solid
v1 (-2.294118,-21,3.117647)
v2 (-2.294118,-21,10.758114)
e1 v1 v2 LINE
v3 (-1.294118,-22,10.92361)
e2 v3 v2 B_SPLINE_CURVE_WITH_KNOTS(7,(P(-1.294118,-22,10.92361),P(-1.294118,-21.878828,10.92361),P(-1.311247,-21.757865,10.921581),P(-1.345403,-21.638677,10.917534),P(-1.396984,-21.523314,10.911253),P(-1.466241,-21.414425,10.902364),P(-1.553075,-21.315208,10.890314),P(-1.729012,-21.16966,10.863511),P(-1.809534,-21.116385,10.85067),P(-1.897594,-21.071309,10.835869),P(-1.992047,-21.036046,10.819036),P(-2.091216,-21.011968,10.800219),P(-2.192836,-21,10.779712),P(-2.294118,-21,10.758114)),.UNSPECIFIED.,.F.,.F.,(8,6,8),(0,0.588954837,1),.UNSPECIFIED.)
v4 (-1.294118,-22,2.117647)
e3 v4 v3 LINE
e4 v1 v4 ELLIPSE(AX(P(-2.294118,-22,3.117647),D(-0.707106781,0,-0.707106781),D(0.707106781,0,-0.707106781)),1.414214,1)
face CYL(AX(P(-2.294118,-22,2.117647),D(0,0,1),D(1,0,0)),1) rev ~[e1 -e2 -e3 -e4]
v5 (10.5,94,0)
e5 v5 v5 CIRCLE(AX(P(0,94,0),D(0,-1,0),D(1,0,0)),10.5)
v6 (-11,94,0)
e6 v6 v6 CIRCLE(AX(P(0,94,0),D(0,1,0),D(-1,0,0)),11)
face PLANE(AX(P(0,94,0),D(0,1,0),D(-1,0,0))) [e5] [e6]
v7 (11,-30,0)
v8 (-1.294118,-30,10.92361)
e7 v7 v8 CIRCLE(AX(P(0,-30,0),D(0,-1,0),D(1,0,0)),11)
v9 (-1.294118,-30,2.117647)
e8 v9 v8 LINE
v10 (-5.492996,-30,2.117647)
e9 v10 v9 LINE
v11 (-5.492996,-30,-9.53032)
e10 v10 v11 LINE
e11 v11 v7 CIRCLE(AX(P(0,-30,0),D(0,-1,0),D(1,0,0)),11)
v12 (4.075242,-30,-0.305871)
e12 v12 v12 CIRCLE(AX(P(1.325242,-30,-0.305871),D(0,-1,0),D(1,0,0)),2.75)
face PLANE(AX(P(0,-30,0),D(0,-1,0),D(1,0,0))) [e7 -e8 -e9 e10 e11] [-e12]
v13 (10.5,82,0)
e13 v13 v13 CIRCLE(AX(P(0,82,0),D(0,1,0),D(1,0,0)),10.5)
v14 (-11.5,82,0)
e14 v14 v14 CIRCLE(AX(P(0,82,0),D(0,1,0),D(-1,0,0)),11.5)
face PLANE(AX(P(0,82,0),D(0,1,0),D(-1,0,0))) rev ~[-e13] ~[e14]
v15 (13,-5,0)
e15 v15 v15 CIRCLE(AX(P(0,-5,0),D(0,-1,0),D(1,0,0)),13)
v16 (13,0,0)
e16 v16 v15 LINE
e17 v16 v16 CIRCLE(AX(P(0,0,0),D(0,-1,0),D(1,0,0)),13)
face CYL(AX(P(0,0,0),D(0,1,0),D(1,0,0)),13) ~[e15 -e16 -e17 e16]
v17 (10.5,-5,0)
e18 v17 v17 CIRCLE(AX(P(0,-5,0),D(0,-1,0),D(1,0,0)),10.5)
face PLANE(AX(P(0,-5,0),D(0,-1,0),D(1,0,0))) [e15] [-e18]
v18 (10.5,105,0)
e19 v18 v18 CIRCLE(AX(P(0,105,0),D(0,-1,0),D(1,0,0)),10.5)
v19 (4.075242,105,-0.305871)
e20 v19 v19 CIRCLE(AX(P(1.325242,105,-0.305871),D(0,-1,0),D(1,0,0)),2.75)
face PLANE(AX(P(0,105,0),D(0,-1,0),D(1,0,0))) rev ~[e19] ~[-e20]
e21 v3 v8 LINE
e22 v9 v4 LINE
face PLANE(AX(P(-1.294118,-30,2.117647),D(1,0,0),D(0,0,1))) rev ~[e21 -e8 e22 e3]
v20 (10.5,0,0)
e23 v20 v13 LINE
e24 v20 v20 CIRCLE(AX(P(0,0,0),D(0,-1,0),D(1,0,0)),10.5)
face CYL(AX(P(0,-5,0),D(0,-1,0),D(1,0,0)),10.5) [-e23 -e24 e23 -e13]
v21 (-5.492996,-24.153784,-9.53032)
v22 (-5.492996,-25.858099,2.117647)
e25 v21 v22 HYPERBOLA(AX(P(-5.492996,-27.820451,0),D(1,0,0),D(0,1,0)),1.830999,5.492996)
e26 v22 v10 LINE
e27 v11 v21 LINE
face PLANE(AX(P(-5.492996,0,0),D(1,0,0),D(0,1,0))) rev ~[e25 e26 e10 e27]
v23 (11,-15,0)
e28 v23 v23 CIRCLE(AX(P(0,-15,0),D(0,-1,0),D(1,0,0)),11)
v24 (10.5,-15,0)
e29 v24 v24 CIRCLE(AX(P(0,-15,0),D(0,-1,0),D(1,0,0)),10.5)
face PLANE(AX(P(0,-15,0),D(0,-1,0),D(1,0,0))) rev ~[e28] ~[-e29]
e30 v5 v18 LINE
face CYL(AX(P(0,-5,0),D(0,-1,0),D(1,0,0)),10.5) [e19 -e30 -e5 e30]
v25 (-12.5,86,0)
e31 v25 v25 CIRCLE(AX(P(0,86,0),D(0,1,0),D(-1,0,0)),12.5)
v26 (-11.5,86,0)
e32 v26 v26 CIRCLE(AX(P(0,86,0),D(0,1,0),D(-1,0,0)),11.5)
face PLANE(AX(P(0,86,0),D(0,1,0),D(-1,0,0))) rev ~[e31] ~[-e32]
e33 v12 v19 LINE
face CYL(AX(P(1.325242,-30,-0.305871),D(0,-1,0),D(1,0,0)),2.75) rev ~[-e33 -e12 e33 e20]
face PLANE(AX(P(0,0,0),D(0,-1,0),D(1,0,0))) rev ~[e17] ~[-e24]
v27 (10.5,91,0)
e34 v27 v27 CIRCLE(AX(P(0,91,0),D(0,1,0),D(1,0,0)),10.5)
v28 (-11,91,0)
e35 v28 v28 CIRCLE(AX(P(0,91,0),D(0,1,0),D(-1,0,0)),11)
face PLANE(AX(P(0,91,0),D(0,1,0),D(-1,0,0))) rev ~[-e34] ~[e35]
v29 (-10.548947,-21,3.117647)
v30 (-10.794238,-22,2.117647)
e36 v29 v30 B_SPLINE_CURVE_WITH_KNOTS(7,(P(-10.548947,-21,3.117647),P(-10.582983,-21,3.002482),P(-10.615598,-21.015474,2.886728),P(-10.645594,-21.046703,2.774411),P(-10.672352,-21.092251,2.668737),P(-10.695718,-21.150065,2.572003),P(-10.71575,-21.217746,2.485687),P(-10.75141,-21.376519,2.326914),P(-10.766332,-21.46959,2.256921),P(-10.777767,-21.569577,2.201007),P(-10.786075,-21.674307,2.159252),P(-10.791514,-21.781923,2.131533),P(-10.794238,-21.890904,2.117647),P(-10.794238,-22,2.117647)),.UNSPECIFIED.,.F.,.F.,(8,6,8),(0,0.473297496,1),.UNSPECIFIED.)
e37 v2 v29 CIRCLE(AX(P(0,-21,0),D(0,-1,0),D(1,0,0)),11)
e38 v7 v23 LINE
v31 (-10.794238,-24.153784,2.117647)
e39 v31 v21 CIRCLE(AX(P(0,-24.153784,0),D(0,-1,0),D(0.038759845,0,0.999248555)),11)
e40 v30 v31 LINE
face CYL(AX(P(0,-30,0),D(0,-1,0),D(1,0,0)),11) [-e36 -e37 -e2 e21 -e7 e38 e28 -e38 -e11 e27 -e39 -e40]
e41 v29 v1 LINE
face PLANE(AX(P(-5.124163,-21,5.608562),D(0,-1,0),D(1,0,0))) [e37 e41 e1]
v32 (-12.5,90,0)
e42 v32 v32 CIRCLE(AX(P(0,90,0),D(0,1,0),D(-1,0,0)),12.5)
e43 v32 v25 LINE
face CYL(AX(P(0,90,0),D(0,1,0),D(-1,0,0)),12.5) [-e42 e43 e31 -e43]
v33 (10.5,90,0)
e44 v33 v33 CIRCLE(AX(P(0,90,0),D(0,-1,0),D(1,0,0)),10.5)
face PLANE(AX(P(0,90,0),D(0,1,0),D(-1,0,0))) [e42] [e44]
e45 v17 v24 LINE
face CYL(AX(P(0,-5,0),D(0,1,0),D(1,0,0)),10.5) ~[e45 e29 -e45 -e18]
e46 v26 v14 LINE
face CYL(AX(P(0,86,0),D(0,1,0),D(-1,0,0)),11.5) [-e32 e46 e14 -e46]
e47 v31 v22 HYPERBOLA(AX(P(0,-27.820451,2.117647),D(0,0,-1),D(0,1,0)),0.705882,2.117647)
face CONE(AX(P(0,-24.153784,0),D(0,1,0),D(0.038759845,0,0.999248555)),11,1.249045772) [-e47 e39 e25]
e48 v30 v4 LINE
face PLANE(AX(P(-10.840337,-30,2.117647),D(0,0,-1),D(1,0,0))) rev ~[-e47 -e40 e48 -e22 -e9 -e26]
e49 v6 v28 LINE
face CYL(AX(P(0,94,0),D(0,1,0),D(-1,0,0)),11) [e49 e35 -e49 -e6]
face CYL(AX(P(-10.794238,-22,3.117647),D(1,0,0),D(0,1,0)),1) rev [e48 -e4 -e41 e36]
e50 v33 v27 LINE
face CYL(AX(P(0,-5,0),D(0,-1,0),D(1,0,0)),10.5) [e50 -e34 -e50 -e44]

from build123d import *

# Parameters (mm, degrees)
F0_R          = 13
F1_DEPTH      = 5
F2_R          = 10.5
F3_DEPTH      = 25
F3_DEPTH_BACK = 110
F6_START      = -19
F5_R          = 11.5
F5_R_2        = 10.5
F6_DEPTH      = 4
F7_R          = 11
F7_R_2        = 10.5
F8_DEPTH      = 15
F10_DEPTH     = 9
F11_R         = 1
F12_W         = 8.5742305964
F12_H         = 3.8462157547
F13_DEPTH     = 30
F14_T4_ANGLE  = 233.385278584
F16_START     = -15
F15_R         = 12.5
F15_R_2       = 10.5
F16_DEPTH     = 4
F18_START     = -11
F17_R         = 11
F17_R_2       = 10.5
F18_DEPTH     = 3
F19_R         = 2.75
F20_DEPTH     = 148


# Not quite as in the source:
# - a fillet or chamfer that OpenCascade refuses, or shapes differently, is made with other operations: its cross-section is extruded or revolved along the edge and cut away or added


with BuildPart() as f1:
    # F0 (on Front) → F1 (new body)
    with BuildSketch(Plane.XZ):
        Circle(F0_R)
    extrude(amount=F1_DEPTH)

    # F2 (on face) → F3 (join, two sides)
    with BuildSketch(Plane.XZ.offset(5)) as f3_sk:
        Circle(F2_R)
    extrude(amount=F3_DEPTH)
    extrude(f3_sk.sketch, amount=-F3_DEPTH_BACK)

    # F5 (on face) → F6 (join)
    with BuildSketch(Plane(origin=(0, 105, 0), x_dir=(-1, 0, 0), z_dir=(0, 1, 0)).offset(F6_START)):
        Circle(F5_R)
        Circle(F5_R_2, mode=Mode.SUBTRACT)
    extrude(amount=-F6_DEPTH)

    # F7 (on face) → F8 (join)
    with BuildSketch(Plane.XZ.offset(30)):
        Circle(F7_R)
        Circle(F7_R_2, mode=Mode.SUBTRACT)
    extrude(amount=-F8_DEPTH)

    # F9 (on face) → F10 (cut)
    with BuildSketch(Plane.XZ.offset(30)):
        with BuildLine():
            Line((-1.2941175373, 2.1176473238), (-1.2941175373, 10.9243700281))
            ThreePointArc((-1.2941175373, 10.9243700281), (-7.5067341919, 8.0813904617), (-10.8403367922, 2.1176473238))
            Line((-10.8403367922, 2.1176473238), (-1.2941175373, 2.1176473238))
        make_face()
    extrude(amount=-F10_DEPTH, mode=Mode.SUBTRACT)

    # F11
    f11_edges = [f1.edges().sort_by_distance(p)[0] for p in [
        (-6.044178, -21, 2.117647),
        (-1.294118, -21, 6.520629),
    ]]
    fillet(f11_edges, radius=F11_R)

    # F12 (on face) → F13 (cut)
    with BuildSketch(Plane.XY.offset(2.1176473238)):
        with Locations((-9.7801117226, -28.0768921226)):
            Rectangle(F12_W, F12_H)
    extrude(amount=-F13_DEPTH, mode=Mode.SUBTRACT)

    # F14: chamfer of 6 x 2 on 1 edges, made by hand


with BuildPart() as f14_tool2:
    # F14_s3 → F14_t4 (revolve)
    with BuildSketch(Plane(origin=(0, 0, 0), x_dir=(0, 1, 0), z_dir=(0.9992485549, 0, -0.0387598451))):
        Polygon((-24.1537842453, 11), (-26.1537842453, 5), (-26.1537842453, 11), align=None)
    revolve(axis=Axis((0, -26.1537842453, 0), (0, -1, 0)), revolution_arc=F14_T4_ANGLE)

    split(bisect_by=Plane.YZ.offset(-5.4929964244), keep=Keep.BOTTOM)


with BuildPart() as f1_1:
    add(f1.part)

    # F14_t1: cut F14_tool2
    add(f14_tool2.part, mode=Mode.SUBTRACT)

    # F15 (on face) → F16 (join)
    with BuildSketch(Plane(origin=(0, 105, 0), x_dir=(-1, 0, 0), z_dir=(0, 1, 0)).offset(F16_START)):
        Circle(F15_R)
        Circle(F15_R_2, mode=Mode.SUBTRACT)
    extrude(amount=-F16_DEPTH)

    # F17 (on face) → F18 (join)
    with BuildSketch(Plane(origin=(0, 105, 0), x_dir=(-1, 0, 0), z_dir=(0, 1, 0)).offset(F18_START)):
        Circle(F17_R)
        Circle(F17_R_2, mode=Mode.SUBTRACT)
    extrude(amount=-F18_DEPTH)

    # F19 (on face) → F20 (cut)
    with BuildSketch(Plane.XZ.offset(30)):
        with Locations((1.3252417254, -0.3058710963)):
            Circle(F19_R)
    extrude(amount=-F20_DEPTH, mode=Mode.SUBTRACT)


solid = f1_1.part
